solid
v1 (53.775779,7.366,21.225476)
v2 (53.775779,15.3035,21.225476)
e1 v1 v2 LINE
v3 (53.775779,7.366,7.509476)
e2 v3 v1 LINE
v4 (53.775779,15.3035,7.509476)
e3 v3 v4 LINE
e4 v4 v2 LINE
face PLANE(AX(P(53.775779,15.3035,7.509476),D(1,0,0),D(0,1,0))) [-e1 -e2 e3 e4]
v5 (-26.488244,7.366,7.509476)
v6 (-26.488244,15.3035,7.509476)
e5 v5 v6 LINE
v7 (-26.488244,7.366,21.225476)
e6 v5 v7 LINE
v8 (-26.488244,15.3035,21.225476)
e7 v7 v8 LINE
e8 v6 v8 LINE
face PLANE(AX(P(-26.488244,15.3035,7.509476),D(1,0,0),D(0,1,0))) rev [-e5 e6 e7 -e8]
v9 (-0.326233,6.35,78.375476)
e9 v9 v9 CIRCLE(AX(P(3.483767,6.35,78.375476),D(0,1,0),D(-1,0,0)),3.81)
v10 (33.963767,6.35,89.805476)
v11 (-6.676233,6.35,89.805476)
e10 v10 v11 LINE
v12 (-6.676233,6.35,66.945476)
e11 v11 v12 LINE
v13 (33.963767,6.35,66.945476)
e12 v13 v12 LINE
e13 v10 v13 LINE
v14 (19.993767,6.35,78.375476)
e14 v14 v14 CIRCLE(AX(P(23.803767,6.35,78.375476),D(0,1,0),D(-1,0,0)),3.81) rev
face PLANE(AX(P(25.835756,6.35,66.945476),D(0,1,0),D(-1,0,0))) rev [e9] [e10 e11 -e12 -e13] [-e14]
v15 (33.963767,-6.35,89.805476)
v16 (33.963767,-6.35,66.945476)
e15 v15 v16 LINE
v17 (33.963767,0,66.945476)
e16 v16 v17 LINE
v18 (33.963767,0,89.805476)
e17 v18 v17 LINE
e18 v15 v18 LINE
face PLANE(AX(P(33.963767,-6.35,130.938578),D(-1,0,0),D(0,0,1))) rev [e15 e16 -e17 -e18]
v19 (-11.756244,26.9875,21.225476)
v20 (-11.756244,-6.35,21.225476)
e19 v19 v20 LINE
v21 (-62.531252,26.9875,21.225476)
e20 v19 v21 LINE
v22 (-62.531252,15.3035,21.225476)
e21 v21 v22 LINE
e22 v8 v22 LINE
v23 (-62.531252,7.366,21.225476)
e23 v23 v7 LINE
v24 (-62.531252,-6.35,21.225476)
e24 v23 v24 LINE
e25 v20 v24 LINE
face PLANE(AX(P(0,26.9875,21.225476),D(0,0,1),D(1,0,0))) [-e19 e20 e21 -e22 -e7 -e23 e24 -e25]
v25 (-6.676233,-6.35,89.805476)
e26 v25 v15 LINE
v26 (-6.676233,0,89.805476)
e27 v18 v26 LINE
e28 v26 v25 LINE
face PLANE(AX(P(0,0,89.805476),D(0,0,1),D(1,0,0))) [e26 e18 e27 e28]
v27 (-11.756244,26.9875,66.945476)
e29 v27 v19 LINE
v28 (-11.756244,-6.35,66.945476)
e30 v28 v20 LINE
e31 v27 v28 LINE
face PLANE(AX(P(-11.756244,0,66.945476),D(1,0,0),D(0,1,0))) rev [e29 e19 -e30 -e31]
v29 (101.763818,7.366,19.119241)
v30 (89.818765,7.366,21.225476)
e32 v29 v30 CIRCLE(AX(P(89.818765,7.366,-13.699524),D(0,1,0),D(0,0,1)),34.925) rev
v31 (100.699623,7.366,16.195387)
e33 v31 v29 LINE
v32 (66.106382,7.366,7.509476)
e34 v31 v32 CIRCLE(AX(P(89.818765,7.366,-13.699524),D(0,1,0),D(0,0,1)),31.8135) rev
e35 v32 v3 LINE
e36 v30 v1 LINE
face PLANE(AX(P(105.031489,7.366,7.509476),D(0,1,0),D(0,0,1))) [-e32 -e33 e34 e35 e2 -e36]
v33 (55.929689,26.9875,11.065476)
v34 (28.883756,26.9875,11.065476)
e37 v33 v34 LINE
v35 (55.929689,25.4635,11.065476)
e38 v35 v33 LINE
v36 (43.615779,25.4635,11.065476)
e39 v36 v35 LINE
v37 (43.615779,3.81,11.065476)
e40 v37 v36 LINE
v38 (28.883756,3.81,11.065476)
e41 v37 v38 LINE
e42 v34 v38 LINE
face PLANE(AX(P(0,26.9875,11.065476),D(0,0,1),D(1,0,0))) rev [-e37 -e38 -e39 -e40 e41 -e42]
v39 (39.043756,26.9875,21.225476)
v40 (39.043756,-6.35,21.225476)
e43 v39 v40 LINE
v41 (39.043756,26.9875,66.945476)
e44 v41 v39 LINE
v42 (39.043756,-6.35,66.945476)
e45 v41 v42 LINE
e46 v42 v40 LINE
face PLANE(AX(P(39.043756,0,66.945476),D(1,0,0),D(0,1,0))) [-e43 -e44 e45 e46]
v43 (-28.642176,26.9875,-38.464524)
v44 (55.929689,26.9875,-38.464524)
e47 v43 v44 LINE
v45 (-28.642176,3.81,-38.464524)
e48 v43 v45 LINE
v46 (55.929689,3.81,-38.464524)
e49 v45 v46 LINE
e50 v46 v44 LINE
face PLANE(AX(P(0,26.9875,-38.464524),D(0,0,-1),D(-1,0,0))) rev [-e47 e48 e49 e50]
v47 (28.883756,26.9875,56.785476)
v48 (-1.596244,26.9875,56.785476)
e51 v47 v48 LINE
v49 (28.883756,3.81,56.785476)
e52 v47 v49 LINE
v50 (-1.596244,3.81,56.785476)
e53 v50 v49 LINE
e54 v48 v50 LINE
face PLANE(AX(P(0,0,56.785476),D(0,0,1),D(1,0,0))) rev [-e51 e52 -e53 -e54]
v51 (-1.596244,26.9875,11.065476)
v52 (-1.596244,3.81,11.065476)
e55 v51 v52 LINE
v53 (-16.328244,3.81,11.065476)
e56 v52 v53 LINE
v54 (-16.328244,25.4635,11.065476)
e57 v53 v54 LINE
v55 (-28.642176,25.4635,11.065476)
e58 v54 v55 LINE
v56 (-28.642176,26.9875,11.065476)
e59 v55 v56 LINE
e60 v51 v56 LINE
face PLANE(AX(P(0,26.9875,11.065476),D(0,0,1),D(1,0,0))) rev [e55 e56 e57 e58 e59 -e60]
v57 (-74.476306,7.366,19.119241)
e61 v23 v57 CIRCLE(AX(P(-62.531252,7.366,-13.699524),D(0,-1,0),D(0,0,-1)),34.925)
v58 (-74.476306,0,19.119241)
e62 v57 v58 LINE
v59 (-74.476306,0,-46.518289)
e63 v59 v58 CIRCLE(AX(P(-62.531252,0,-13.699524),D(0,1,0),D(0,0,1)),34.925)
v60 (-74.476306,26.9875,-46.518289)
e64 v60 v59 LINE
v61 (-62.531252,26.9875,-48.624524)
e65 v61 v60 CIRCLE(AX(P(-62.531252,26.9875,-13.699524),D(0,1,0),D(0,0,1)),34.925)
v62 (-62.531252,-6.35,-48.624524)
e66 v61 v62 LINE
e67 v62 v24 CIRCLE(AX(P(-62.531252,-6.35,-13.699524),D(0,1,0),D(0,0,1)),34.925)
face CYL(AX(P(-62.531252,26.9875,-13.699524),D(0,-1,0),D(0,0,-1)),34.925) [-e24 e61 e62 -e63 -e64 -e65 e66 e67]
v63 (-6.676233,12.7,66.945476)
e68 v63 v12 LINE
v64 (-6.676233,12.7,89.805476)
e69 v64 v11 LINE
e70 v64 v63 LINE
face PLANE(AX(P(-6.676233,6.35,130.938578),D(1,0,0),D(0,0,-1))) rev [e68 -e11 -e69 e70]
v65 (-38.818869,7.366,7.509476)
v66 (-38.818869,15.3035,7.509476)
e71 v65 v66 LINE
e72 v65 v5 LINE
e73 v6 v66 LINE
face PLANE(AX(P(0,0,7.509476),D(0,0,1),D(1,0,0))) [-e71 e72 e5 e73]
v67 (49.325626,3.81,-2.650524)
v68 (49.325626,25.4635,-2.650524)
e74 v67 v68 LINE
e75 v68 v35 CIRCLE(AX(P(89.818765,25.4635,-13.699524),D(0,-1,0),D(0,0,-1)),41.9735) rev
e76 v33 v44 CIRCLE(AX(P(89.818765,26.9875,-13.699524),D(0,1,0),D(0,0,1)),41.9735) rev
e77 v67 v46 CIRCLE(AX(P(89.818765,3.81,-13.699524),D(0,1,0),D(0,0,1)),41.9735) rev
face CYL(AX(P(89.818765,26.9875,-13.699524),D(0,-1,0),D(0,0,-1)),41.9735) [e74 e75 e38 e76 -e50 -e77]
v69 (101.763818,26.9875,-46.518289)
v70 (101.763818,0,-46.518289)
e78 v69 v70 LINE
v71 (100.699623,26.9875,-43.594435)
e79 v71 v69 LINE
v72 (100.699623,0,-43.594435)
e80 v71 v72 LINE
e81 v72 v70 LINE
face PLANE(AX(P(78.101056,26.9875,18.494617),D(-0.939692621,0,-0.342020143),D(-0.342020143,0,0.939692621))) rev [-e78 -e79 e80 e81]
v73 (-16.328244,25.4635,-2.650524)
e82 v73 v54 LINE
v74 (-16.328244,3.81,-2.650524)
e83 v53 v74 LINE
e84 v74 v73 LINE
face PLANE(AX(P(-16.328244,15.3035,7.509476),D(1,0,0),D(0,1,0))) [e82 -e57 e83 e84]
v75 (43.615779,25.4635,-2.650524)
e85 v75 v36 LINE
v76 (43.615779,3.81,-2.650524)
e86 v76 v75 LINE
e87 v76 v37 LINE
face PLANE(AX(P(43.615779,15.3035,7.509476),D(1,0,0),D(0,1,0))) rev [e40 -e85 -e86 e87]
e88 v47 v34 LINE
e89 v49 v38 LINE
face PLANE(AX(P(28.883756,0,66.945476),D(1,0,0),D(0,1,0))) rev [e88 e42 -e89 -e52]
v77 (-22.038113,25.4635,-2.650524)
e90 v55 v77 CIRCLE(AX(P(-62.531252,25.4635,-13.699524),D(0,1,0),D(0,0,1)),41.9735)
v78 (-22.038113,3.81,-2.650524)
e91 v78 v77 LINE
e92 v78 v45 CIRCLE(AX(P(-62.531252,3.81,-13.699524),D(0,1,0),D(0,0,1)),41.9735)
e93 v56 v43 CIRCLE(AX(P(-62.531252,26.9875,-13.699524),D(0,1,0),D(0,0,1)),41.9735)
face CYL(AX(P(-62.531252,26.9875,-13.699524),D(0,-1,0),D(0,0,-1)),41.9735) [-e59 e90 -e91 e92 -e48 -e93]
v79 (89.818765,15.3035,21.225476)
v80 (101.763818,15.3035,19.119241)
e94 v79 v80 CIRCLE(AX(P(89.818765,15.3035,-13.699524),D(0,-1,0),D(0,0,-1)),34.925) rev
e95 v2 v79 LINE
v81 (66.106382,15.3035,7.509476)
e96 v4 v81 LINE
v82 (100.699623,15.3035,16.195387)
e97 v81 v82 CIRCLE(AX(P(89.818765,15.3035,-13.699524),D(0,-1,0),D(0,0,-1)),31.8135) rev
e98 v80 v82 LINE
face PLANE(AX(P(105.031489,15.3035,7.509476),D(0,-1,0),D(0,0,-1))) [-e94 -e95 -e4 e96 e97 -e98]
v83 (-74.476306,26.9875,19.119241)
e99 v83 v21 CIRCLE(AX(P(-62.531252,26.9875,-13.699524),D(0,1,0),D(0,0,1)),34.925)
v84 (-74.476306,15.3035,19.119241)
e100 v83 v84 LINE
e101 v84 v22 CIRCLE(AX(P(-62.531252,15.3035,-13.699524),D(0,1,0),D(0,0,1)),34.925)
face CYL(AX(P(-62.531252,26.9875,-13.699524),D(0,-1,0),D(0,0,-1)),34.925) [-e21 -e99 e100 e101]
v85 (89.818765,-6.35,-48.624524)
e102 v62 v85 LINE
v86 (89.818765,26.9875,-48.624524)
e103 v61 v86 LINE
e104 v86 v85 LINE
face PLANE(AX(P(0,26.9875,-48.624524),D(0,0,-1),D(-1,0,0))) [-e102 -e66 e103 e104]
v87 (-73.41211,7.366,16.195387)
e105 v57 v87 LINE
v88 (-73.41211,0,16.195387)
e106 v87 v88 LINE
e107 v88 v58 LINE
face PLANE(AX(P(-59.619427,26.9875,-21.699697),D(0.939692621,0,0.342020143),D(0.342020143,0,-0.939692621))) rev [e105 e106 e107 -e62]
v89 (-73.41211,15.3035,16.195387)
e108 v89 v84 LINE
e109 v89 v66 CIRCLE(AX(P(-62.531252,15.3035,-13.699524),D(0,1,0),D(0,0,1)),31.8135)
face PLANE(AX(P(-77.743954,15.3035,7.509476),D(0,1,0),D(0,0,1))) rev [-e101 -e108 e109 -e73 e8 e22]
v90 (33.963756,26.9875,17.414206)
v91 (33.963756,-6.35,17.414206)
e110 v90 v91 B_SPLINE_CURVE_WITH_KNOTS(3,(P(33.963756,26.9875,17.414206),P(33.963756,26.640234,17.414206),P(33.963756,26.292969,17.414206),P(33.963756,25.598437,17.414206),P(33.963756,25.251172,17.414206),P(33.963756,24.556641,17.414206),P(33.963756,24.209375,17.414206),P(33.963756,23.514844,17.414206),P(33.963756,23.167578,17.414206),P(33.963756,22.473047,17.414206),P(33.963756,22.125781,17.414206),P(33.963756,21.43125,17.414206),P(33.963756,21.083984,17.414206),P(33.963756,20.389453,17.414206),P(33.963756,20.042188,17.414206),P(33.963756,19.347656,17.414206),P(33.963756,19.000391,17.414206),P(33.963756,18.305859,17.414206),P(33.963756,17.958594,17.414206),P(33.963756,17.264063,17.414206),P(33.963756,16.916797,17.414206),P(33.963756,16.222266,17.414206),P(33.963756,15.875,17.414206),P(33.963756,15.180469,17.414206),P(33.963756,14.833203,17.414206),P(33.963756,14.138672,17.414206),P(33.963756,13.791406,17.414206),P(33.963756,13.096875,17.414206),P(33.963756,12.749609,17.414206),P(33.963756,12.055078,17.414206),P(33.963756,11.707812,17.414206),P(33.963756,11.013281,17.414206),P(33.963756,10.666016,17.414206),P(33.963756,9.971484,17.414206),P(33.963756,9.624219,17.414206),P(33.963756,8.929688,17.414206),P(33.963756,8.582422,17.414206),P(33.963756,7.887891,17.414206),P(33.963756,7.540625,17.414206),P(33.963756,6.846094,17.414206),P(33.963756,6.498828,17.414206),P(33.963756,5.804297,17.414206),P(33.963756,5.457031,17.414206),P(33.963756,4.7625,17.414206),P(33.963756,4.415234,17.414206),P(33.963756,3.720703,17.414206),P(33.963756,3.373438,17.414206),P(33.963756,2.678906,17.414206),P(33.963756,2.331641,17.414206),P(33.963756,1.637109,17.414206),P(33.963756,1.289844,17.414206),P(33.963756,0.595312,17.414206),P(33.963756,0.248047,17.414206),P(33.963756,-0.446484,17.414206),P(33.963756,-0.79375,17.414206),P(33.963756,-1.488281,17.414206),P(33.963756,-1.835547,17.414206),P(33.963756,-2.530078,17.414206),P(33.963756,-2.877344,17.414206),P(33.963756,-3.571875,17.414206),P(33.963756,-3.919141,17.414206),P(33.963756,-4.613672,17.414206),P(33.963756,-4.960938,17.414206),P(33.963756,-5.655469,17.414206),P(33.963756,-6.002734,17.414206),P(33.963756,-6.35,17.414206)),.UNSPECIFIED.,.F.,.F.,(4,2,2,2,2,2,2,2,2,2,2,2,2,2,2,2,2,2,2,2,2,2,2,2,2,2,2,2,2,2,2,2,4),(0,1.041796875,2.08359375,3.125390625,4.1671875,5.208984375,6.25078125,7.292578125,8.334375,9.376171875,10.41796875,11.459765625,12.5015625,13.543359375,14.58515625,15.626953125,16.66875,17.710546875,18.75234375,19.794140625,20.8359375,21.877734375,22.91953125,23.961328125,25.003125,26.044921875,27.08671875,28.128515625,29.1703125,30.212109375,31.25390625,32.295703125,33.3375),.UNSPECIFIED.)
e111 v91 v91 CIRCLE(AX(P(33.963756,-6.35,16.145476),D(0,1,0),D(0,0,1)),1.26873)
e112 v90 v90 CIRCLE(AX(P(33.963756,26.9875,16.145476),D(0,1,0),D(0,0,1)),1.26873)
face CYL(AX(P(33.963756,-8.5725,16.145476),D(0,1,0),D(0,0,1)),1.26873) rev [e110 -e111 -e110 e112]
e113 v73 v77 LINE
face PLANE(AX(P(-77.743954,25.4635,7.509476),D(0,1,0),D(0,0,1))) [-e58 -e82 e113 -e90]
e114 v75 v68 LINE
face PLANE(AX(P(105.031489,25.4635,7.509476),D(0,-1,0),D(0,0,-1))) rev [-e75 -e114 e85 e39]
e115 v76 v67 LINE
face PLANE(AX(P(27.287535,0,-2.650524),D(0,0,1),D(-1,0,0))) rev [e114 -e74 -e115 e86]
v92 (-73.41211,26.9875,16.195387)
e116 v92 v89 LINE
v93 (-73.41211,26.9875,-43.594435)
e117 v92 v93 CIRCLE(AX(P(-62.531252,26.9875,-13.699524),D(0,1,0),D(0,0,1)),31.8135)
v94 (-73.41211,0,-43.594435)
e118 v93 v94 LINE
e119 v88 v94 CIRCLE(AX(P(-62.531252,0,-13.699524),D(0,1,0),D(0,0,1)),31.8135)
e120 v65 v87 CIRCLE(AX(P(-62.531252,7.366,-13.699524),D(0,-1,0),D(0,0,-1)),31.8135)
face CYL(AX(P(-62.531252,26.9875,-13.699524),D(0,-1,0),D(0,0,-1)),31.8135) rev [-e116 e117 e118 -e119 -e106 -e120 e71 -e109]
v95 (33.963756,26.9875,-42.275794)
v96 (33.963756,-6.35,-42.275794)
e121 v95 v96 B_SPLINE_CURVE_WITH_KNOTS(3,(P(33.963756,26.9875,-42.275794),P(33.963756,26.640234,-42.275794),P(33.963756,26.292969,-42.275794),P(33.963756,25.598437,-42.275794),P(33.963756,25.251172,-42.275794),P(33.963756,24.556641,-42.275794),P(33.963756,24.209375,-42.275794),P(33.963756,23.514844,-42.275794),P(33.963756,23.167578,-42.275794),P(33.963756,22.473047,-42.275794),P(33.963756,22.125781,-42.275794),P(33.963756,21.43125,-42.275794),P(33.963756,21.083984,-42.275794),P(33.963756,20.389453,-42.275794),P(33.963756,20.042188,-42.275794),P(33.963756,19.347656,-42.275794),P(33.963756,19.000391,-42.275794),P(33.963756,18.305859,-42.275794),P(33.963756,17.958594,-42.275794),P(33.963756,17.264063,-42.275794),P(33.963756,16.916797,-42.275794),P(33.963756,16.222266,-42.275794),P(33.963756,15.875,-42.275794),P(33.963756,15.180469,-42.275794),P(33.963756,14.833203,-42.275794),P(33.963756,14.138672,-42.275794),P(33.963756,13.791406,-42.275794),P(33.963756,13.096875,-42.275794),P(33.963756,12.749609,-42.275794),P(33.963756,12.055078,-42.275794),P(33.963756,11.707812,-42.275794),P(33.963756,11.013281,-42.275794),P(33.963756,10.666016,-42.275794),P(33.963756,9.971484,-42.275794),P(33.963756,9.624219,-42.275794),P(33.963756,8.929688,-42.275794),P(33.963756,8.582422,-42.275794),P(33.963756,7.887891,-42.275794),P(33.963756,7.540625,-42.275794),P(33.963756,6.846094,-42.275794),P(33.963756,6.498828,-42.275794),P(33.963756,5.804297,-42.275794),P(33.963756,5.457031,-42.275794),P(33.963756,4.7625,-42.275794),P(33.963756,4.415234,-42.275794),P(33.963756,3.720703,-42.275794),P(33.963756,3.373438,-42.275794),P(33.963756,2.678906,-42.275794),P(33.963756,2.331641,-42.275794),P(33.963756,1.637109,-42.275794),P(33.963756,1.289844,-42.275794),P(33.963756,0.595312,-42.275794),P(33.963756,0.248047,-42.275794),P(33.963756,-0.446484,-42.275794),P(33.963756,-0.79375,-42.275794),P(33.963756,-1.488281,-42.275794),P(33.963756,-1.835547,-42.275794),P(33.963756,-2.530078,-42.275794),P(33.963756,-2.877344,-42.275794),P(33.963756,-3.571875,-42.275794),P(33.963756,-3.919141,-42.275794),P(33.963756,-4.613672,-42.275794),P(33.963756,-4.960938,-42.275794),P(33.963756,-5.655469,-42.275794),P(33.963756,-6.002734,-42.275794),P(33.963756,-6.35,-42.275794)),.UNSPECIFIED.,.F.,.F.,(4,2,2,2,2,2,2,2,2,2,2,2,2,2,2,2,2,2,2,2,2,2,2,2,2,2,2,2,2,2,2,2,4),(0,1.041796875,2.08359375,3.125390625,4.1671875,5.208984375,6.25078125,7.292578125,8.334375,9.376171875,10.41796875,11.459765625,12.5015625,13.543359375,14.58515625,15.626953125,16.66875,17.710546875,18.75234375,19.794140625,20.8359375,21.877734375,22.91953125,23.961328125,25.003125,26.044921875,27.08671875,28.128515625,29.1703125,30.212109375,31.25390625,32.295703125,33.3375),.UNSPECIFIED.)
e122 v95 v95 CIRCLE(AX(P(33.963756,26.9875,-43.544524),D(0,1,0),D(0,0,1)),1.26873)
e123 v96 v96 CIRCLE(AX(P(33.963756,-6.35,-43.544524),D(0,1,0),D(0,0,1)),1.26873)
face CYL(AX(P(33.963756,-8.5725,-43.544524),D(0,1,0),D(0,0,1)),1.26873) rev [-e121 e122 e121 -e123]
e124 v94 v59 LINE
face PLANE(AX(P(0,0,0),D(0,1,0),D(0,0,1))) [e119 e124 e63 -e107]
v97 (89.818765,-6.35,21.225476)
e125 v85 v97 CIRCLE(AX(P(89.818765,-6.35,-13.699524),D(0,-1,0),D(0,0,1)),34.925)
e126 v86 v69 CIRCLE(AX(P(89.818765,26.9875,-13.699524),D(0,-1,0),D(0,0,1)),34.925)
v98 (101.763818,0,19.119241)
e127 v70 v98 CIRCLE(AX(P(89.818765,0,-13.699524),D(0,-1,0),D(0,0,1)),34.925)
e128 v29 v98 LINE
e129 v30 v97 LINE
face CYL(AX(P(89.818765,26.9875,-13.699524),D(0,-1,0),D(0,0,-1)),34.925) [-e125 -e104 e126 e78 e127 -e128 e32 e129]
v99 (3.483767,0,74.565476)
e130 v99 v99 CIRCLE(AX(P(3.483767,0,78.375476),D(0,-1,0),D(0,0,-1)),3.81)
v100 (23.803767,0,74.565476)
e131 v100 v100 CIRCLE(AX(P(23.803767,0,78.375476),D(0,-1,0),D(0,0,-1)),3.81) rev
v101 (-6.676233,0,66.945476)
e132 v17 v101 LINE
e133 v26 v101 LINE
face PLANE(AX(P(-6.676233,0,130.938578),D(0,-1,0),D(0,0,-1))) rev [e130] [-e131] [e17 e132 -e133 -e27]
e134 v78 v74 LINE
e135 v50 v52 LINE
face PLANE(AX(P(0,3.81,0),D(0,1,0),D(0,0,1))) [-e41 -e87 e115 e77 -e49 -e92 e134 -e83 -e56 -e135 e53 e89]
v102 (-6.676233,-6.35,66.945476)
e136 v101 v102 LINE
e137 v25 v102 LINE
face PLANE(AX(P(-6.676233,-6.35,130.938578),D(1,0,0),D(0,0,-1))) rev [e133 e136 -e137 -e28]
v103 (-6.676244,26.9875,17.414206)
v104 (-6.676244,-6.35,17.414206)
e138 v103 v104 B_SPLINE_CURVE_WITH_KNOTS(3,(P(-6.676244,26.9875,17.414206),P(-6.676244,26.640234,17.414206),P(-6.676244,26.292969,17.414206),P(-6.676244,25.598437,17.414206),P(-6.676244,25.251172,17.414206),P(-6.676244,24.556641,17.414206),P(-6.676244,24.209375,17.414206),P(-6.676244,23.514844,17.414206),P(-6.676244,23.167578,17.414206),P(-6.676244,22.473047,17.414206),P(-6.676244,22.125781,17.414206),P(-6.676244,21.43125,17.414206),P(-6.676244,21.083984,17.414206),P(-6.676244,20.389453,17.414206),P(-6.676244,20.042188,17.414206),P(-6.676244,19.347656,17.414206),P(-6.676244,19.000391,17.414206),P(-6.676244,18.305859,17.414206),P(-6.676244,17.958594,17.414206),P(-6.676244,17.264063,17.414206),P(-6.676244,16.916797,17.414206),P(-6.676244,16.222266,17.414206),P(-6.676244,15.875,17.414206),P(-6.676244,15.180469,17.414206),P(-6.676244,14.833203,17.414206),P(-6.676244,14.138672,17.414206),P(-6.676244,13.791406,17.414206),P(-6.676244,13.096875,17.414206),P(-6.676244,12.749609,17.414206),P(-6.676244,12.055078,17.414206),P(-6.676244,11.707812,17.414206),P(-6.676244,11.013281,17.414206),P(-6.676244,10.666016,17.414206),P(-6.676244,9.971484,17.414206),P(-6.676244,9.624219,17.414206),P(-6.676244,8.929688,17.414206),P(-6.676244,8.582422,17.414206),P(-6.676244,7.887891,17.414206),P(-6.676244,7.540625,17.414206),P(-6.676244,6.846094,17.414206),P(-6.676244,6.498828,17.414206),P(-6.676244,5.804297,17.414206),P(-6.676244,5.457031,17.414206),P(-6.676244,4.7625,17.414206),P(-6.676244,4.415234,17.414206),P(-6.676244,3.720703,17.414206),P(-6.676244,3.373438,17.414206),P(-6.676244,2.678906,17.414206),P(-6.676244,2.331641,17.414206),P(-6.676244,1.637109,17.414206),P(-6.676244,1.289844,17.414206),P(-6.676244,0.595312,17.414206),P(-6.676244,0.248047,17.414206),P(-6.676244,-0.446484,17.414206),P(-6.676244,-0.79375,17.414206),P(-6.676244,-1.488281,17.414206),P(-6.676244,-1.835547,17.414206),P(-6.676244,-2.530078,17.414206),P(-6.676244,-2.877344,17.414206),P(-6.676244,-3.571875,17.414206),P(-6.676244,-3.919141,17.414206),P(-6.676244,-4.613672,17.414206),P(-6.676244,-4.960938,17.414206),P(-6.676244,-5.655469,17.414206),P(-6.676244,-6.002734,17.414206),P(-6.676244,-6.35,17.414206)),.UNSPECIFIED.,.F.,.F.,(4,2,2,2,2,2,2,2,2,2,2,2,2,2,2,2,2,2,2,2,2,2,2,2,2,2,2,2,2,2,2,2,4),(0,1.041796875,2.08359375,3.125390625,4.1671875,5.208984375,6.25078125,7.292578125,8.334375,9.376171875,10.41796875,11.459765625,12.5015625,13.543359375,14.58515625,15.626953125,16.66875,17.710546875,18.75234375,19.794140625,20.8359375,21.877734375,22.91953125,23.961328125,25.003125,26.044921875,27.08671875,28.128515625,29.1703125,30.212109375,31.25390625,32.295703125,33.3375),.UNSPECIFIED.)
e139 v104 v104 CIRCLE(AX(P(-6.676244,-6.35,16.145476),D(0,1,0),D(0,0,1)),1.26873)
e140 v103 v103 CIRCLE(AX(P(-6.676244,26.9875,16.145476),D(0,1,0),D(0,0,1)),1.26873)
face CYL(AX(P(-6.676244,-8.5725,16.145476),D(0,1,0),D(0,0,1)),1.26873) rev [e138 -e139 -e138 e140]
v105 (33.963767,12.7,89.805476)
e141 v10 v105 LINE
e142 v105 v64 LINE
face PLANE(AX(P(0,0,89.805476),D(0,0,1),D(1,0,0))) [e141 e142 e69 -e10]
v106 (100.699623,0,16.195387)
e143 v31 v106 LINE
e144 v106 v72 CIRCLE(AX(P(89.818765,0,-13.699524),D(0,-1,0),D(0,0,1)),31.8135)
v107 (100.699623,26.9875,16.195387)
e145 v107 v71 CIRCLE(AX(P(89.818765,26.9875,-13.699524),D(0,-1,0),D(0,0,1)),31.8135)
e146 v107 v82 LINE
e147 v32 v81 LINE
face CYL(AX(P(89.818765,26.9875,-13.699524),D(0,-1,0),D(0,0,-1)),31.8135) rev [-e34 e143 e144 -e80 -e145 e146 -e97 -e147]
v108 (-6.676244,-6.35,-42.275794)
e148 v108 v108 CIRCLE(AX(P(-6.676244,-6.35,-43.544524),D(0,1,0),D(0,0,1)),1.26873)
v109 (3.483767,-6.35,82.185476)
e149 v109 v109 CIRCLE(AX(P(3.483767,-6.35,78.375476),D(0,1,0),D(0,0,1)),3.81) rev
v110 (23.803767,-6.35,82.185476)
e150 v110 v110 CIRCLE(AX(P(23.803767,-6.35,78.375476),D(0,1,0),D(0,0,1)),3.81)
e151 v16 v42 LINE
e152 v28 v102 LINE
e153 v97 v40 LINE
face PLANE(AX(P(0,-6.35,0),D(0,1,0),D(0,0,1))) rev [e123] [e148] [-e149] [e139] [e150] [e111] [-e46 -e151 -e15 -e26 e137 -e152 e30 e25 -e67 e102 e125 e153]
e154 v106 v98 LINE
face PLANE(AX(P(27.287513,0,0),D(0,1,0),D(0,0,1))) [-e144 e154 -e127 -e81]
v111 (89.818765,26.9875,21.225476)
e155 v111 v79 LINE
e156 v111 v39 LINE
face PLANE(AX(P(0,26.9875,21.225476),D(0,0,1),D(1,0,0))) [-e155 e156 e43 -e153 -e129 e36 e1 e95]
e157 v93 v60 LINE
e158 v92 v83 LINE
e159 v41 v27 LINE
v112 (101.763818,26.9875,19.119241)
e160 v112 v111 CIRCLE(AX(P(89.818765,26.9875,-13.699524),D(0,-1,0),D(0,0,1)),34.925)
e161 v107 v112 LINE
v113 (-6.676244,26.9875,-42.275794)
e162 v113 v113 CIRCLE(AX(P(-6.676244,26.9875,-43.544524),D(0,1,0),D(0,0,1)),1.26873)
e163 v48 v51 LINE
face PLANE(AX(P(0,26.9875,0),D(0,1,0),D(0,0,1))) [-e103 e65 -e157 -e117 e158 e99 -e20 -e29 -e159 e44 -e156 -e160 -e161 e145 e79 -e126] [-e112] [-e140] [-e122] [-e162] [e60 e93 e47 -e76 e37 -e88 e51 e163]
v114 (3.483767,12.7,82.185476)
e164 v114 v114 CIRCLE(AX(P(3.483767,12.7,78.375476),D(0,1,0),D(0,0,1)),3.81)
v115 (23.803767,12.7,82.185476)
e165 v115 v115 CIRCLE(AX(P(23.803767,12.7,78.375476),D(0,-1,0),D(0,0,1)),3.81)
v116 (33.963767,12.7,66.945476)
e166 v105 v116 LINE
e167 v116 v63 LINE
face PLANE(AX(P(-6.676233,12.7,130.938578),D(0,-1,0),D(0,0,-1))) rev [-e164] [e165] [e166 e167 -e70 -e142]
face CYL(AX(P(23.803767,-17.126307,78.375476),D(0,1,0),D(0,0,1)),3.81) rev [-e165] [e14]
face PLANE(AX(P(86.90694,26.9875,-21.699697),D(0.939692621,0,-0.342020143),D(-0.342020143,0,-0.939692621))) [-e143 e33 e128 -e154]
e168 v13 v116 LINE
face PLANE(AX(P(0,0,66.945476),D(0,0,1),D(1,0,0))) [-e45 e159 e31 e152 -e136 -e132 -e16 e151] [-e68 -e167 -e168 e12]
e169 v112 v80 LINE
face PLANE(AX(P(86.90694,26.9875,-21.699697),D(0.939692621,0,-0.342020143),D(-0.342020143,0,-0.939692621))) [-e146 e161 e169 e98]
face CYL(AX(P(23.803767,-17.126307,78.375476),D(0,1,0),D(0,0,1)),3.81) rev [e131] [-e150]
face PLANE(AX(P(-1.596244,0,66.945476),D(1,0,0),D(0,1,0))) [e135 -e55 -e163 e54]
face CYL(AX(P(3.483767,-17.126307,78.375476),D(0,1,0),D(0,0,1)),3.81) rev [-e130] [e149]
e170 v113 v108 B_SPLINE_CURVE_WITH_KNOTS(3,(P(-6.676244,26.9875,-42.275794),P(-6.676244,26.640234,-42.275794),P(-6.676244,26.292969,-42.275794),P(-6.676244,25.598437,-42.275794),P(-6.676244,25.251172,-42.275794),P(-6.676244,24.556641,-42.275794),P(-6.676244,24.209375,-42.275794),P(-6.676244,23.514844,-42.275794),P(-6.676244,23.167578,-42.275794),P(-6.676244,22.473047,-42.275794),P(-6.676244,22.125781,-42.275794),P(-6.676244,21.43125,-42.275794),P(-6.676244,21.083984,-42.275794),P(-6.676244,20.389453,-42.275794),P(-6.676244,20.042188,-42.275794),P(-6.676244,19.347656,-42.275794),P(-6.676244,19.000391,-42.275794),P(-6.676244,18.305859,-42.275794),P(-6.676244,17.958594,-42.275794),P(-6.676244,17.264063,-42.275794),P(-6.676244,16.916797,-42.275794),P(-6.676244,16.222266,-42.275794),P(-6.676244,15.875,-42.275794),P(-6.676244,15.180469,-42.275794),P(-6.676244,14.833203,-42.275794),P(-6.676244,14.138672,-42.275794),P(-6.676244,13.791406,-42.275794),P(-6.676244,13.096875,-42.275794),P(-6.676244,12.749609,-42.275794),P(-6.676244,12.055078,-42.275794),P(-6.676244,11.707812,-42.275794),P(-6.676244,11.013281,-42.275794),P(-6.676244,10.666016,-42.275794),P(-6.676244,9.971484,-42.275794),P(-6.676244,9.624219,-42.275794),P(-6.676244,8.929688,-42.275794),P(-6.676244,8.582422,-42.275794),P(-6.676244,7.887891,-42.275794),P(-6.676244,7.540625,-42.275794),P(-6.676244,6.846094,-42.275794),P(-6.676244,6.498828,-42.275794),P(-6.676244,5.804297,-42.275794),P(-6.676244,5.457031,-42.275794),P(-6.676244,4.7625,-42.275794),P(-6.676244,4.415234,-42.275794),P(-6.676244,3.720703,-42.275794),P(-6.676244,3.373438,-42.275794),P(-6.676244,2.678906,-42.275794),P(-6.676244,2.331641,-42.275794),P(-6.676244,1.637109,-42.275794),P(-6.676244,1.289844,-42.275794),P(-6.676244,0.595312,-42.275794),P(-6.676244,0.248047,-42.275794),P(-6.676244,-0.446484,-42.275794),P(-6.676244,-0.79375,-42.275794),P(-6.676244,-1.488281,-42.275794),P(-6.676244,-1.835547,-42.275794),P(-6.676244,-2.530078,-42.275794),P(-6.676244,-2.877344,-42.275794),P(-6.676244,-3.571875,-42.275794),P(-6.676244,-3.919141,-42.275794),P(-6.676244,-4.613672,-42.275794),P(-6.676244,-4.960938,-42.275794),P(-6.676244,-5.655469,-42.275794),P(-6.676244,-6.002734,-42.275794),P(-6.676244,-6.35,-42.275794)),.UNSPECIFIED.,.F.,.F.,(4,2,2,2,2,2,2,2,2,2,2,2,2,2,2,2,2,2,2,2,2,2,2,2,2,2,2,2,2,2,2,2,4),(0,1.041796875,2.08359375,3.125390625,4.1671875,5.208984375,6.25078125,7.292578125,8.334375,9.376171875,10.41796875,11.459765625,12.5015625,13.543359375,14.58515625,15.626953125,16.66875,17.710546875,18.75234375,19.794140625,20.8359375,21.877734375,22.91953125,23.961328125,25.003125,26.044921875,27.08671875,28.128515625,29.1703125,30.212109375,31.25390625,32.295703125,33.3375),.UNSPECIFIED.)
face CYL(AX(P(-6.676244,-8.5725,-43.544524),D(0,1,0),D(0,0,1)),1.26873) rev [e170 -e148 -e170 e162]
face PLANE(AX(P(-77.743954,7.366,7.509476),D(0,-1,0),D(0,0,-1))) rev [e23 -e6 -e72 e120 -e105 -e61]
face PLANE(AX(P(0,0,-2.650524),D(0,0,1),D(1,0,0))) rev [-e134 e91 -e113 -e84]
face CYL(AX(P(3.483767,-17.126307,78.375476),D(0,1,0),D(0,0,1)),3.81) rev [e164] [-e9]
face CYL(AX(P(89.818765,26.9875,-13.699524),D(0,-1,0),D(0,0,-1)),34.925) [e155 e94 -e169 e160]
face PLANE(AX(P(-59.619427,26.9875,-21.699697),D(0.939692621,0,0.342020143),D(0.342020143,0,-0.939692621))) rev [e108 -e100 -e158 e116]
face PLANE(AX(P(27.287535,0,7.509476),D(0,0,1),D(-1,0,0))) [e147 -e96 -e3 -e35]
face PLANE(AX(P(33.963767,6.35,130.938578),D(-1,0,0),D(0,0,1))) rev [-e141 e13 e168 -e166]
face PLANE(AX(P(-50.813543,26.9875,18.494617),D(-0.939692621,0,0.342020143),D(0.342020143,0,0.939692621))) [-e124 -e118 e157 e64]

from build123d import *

# Parameters (mm, degrees)
BOSS_EXTRUDE1_DEPTH = 26.9875
BOSS_EXTRUDE5_START = -6.35
BOSS_EXTRUDE5_DEPTH = 6.35
SKETCH3_W           = 25.4
SKETCH3_H           = 33.3375
BOSS_EXTRUDE7_DEPTH = 45.72
SKETCH6_W           = 8.89
SKETCH6_H           = 33.3375
BOSS_EXTRUDE8_DEPTH = 22.86
SKETCH7_W           = 22.86
SKETCH7_H           = 14.5415
SKETCH7_H_2         = 6.604
CUT_EXTRUDE1_DEPTH  = 21.082
SKETCH11_W          = 51.2557102
SKETCH11_H          = 7.9375
CUT_EXTRUDE3_DEPTH  = 13.716
SHELL1_START        = 3.81
SHELL1_DEPTH        = 23.1775
SHELL1_START_2      = 25.4635
SHELL1_2_DEPTH      = 1.524
SKETCH13_R          = 1.26873
CUT_EXTRUDE4_DEPTH  = 35.56
SKETCH14_W          = 40.64
SKETCH14_H          = 6.35
BOSS_EXTRUDE9_DEPTH = 22.86
CUT_EXTRUDE5_REACH  = 156.884
SKETCH16_R          = 3.81


# Read off the part's stored shape, not the designer's step: Shell1
with BuildPart() as part:
    # Sketch1 → Boss-Extrude1 (new body)
    with BuildSketch(Plane(origin=(0, 0, 0), x_dir=(1, 0, 0), z_dir=(0, 1, 0))):
        with BuildLine():
            ThreePointArc((-27.606252307, 13.699523808), (-37.835547974, 38.395228141), (-62.531252307, 48.624523808))
            Line((-62.531252307, 48.624523808), (-62.531252307, 45.513023808))
            ThreePointArc((-62.531252307, 45.513023808), (-40.035710723, 36.195065391), (-30.717752307, 13.699523808))
            ThreePointArc((-30.717752307, 13.699523808), (-40.035710723, -8.796017775), (-62.531252307, -18.113976192))
            Line((-62.531252307, -18.113976192), (-62.531252307, -21.225476192))
            ThreePointArc((-62.531252307, -21.225476192), (-37.835547974, -10.996180525), (-27.606252307, 13.699523808))
        make_face()
        with BuildLine():
            Line((-62.531252307, 45.513023808), (-62.531252307, 48.624523808))
            ThreePointArc((-62.531252307, 48.624523808), (-68.595914912, 48.093934582), (-74.476305812, 46.518288589))
            Line((-74.476305812, 46.518288589), (-73.412110136, 43.594434999))
            ThreePointArc((-73.412110136, 43.594434999), (-68.055608607, 45.029705258), (-62.531252307, 45.513023808))
        make_face()
        with BuildLine():
            ThreePointArc((-74.476305812, -19.119240973), (-68.595914912, -20.694886966), (-62.531252307, -21.225476192))
            Line((-62.531252307, -21.225476192), (-62.531252307, -18.113976192))
            ThreePointArc((-62.531252307, -18.113976192), (-68.055608607, -17.630657643), (-73.412110136, -16.195387383))
            Line((-73.412110136, -16.195387383), (-74.476305812, -19.119240973))
        make_face()
        with BuildLine():
            Line((13.643756331, 48.624523808), (-62.531252307, 48.624523808))
            ThreePointArc((-62.531252307, 48.624523808), (-37.835547974, 38.395228141), (-27.606252307, 13.699523808))
            ThreePointArc((-27.606252307, 13.699523808), (-37.835547974, -10.996180525), (-62.531252307, -21.225476192))
            Line((-62.531252307, -21.225476192), (13.643756331, -21.225476192))
            Line((13.643756331, -21.225476192), (13.643756331, 48.624523808))
        make_face()
    boss_extrude1 = extrude(amount=BOSS_EXTRUDE1_DEPTH)

    # Sketch1<5> → Boss-Extrude5 (add)
    with BuildSketch(Plane(origin=(0, 0, 0), x_dir=(1, 0, 0), z_dir=(0, 1, 0)).offset(BOSS_EXTRUDE5_START)):
        with BuildLine():
            Line((-62.531252307, -21.225476192), (13.643756331, -21.225476192))
            Line((13.643756331, -21.225476192), (13.643756331, 48.624523808))
            Line((13.643756331, 48.624523808), (-62.531252307, 48.624523808))
            ThreePointArc((-62.531252307, 48.624523808), (-97.456252307, 13.699523808), (-62.531252307, -21.225476192))
        make_face()
    boss_extrude5 = extrude(amount=BOSS_EXTRUDE5_DEPTH)

    # Mirror1: Boss-Extrude1, Boss-Extrude5 across plane
    add(boss_extrude1.mirror(Plane(origin=(13.643756331, 26.9875, 0), x_dir=(0, 0, 1), z_dir=(1, 0, 0))))
    add(boss_extrude5.mirror(Plane(origin=(13.643756331, 26.9875, 0), x_dir=(0, 0, 1), z_dir=(1, 0, 0))))

    # Sketch3 → Boss-Extrude7 (add)
    with BuildSketch(Plane.XY.offset(21.225476192)):
        with Locations((0.943756331, 10.31875)):
            Rectangle(SKETCH3_W, SKETCH3_H)
        with Locations((26.343756331, 10.31875)):
            Rectangle(SKETCH3_W, SKETCH3_H)
    extrude(amount=BOSS_EXTRUDE7_DEPTH)

    # Sketch6 → Boss-Extrude8 (add)
    with BuildSketch(Plane.XY.offset(66.945476192)):
        with Locations((9.198756331, 10.31875)):
            Rectangle(SKETCH6_W, SKETCH6_H)
        with Locations((18.088756331, 10.31875)):
            Rectangle(SKETCH6_W, SKETCH6_H)
    extrude(amount=BOSS_EXTRUDE8_DEPTH)

    # Sketch7 → Cut-Extrude1 (cut)
    with BuildSketch(Plane.ZY.offset(-4.753756331)):
        with Locations((78.375476192, 19.71675)):
            Rectangle(SKETCH7_W, SKETCH7_H)
        with Locations((78.375476192, 3.048)):
            Rectangle(SKETCH7_W, SKETCH7_H_2)
    extrude(amount=-CUT_EXTRUDE1_DEPTH, mode=Mode.SUBTRACT)

    # Sketch11 → Cut-Extrude3 (cut)
    with BuildSketch(Plane.XY.offset(21.225476192)):
        with Locations((-52.116098769, 11.33475)):
            Rectangle(SKETCH11_W, SKETCH11_H)
    cut_extrude3 = extrude(amount=-CUT_EXTRUDE3_DEPTH, mode=Mode.SUBTRACT)

    # Mirror2: Cut-Extrude3 across plane
    add(cut_extrude3.mirror(Plane(origin=(13.64376748, 0, 0), x_dir=(0, 0, 1), z_dir=(1, 0, 0))), mode=Mode.SUBTRACT)

    # Shell1 outline → Shell1 (cut)
    with BuildSketch(Plane(origin=(0, 0, 0), x_dir=(1, 0, 0), z_dir=(0, 1, 0)).offset(SHELL1_START)):
        with BuildLine():
            Line((-16.328243669, 2.650523808), (-16.328243669, -11.065476192))
            Line((-16.328243669, -11.065476192), (-1.596243669, -11.065476192))
            Line((-1.596243669, -11.065476192), (-1.596243669, -56.785476192))
            Line((-1.596243669, -56.785476192), (28.883756331, -56.785476192))
            Line((28.883756331, -56.785476192), (28.883756331, -11.065476192))
            Line((28.883756331, -11.065476192), (43.615778629, -11.065476192))
            Line((43.615778629, -11.065476192), (43.615778629, 2.650523808))
            Line((43.615778629, 2.650523808), (49.325626028, 2.650523808))
            ThreePointArc((49.325626028, 2.650523808), (48.541178718, 21.311066068), (55.929688893, 38.464523808))
            Line((55.929688893, 38.464523808), (-28.642176231, 38.464523808))
            ThreePointArc((-28.642176231, 38.464523808), (-21.253666056, 21.311066068), (-22.038113366, 2.650523808))
            Line((-22.038113366, 2.650523808), (-16.328243669, 2.650523808))
        make_face()
    extrude(amount=SHELL1_DEPTH, mode=Mode.SUBTRACT)

    # Shell1 2 outline → Shell1 2 (cut)
    with BuildSketch(Plane(origin=(0, 0, 0), x_dir=(1, 0, 0), z_dir=(0, 1, 0)).offset(SHELL1_START_2)):
        with BuildLine():
            ThreePointArc((-22.038113366, 2.650523808), (-24.713126472, -4.509376779), (-28.642176231, -11.065476192))
            Line((-28.642176231, -11.065476192), (-16.328243669, -11.065476192))
            Line((-16.328243669, -11.065476192), (-16.328243669, 2.650523808))
            Line((-16.328243669, 2.650523808), (-22.038113366, 2.650523808))
        make_face()
        with BuildLine():
            ThreePointArc((55.929688893, -11.065476192), (52.000639133, -4.509376779), (49.325626028, 2.650523808))
            Line((49.325626028, 2.650523808), (43.615778629, 2.650523808))
            Line((43.615778629, 2.650523808), (43.615778629, -11.065476192))
            Line((43.615778629, -11.065476192), (55.929688893, -11.065476192))
        make_face()
    extrude(amount=SHELL1_2_DEPTH, mode=Mode.SUBTRACT)

    # Sketch13 → Cut-Extrude4 (cut)
    with BuildSketch(Plane(origin=(0, 26.9875, 0), x_dir=(1, 0, 0), z_dir=(0, 1, 0))):
        with Locations(Location((33.963756331, -16.145476192, 0), (0, 0, 270))):
            Circle(SKETCH13_R)
        with Locations(Location((-6.676243669, -16.145476192, 0), (0, 0, 270))):
            Circle(SKETCH13_R)
        with Locations(Location((-6.676243669, 43.544523808, 0), (0, 0, 270))):
            Circle(SKETCH13_R)
        with Locations(Location((33.963756331, 43.544523808, 0), (0, 0, 270))):
            Circle(SKETCH13_R)
    extrude(amount=-CUT_EXTRUDE4_DEPTH, mode=Mode.SUBTRACT)

    # Sketch14 → Boss-Extrude9 (add)
    with BuildSketch(Plane.XY.offset(66.945476192)):
        with Locations((13.64376748, 9.525)):
            Rectangle(SKETCH14_W, SKETCH14_H)
        with Locations((13.64376748, -3.175)):
            Rectangle(SKETCH14_W, SKETCH14_H)
    extrude(amount=BOSS_EXTRUDE9_DEPTH)

    # Cut-Extrude5: up to this face of the body (flat: up to its plane)
    cut_extrude5_end = Plane(part.part.faces().sort_by_distance((13.643756916, -6.35, -1.287747725))[0])
    # Sketch16 → Cut-Extrude5 (cut, up to the picked face)
    with BuildSketch(Plane(origin=(0, 12.7, 0), x_dir=(1, 0, 0), z_dir=(0, 1, 0)), mode=Mode.PRIVATE) as cut_extrude5_sk1:
        with Locations(Location((3.48376748, -78.375476192, 0), (0, 0, 270))):
            Circle(SKETCH16_R)
    cut_extrude5_tool1 = split(extrude(cut_extrude5_sk1.sketch, amount=-CUT_EXTRUDE5_REACH, mode=Mode.PRIVATE), bisect_by=cut_extrude5_end, keep=Keep.BOTH, mode=Mode.PRIVATE)
    cut_extrude5 = cut_extrude5_tool1.solids().sort_by(Axis((3.483767, 12.7, 78.375476), (0, -1, 0)))[0]
    add(cut_extrude5, mode=Mode.SUBTRACT)

    # Mirror3: Cut-Extrude5 across plane
    add(cut_extrude5.mirror(Plane(origin=(13.64376748, 0, 0), x_dir=(0, 0, 1), z_dir=(1, 0, 0))), mode=Mode.SUBTRACT)


solid = part.part
